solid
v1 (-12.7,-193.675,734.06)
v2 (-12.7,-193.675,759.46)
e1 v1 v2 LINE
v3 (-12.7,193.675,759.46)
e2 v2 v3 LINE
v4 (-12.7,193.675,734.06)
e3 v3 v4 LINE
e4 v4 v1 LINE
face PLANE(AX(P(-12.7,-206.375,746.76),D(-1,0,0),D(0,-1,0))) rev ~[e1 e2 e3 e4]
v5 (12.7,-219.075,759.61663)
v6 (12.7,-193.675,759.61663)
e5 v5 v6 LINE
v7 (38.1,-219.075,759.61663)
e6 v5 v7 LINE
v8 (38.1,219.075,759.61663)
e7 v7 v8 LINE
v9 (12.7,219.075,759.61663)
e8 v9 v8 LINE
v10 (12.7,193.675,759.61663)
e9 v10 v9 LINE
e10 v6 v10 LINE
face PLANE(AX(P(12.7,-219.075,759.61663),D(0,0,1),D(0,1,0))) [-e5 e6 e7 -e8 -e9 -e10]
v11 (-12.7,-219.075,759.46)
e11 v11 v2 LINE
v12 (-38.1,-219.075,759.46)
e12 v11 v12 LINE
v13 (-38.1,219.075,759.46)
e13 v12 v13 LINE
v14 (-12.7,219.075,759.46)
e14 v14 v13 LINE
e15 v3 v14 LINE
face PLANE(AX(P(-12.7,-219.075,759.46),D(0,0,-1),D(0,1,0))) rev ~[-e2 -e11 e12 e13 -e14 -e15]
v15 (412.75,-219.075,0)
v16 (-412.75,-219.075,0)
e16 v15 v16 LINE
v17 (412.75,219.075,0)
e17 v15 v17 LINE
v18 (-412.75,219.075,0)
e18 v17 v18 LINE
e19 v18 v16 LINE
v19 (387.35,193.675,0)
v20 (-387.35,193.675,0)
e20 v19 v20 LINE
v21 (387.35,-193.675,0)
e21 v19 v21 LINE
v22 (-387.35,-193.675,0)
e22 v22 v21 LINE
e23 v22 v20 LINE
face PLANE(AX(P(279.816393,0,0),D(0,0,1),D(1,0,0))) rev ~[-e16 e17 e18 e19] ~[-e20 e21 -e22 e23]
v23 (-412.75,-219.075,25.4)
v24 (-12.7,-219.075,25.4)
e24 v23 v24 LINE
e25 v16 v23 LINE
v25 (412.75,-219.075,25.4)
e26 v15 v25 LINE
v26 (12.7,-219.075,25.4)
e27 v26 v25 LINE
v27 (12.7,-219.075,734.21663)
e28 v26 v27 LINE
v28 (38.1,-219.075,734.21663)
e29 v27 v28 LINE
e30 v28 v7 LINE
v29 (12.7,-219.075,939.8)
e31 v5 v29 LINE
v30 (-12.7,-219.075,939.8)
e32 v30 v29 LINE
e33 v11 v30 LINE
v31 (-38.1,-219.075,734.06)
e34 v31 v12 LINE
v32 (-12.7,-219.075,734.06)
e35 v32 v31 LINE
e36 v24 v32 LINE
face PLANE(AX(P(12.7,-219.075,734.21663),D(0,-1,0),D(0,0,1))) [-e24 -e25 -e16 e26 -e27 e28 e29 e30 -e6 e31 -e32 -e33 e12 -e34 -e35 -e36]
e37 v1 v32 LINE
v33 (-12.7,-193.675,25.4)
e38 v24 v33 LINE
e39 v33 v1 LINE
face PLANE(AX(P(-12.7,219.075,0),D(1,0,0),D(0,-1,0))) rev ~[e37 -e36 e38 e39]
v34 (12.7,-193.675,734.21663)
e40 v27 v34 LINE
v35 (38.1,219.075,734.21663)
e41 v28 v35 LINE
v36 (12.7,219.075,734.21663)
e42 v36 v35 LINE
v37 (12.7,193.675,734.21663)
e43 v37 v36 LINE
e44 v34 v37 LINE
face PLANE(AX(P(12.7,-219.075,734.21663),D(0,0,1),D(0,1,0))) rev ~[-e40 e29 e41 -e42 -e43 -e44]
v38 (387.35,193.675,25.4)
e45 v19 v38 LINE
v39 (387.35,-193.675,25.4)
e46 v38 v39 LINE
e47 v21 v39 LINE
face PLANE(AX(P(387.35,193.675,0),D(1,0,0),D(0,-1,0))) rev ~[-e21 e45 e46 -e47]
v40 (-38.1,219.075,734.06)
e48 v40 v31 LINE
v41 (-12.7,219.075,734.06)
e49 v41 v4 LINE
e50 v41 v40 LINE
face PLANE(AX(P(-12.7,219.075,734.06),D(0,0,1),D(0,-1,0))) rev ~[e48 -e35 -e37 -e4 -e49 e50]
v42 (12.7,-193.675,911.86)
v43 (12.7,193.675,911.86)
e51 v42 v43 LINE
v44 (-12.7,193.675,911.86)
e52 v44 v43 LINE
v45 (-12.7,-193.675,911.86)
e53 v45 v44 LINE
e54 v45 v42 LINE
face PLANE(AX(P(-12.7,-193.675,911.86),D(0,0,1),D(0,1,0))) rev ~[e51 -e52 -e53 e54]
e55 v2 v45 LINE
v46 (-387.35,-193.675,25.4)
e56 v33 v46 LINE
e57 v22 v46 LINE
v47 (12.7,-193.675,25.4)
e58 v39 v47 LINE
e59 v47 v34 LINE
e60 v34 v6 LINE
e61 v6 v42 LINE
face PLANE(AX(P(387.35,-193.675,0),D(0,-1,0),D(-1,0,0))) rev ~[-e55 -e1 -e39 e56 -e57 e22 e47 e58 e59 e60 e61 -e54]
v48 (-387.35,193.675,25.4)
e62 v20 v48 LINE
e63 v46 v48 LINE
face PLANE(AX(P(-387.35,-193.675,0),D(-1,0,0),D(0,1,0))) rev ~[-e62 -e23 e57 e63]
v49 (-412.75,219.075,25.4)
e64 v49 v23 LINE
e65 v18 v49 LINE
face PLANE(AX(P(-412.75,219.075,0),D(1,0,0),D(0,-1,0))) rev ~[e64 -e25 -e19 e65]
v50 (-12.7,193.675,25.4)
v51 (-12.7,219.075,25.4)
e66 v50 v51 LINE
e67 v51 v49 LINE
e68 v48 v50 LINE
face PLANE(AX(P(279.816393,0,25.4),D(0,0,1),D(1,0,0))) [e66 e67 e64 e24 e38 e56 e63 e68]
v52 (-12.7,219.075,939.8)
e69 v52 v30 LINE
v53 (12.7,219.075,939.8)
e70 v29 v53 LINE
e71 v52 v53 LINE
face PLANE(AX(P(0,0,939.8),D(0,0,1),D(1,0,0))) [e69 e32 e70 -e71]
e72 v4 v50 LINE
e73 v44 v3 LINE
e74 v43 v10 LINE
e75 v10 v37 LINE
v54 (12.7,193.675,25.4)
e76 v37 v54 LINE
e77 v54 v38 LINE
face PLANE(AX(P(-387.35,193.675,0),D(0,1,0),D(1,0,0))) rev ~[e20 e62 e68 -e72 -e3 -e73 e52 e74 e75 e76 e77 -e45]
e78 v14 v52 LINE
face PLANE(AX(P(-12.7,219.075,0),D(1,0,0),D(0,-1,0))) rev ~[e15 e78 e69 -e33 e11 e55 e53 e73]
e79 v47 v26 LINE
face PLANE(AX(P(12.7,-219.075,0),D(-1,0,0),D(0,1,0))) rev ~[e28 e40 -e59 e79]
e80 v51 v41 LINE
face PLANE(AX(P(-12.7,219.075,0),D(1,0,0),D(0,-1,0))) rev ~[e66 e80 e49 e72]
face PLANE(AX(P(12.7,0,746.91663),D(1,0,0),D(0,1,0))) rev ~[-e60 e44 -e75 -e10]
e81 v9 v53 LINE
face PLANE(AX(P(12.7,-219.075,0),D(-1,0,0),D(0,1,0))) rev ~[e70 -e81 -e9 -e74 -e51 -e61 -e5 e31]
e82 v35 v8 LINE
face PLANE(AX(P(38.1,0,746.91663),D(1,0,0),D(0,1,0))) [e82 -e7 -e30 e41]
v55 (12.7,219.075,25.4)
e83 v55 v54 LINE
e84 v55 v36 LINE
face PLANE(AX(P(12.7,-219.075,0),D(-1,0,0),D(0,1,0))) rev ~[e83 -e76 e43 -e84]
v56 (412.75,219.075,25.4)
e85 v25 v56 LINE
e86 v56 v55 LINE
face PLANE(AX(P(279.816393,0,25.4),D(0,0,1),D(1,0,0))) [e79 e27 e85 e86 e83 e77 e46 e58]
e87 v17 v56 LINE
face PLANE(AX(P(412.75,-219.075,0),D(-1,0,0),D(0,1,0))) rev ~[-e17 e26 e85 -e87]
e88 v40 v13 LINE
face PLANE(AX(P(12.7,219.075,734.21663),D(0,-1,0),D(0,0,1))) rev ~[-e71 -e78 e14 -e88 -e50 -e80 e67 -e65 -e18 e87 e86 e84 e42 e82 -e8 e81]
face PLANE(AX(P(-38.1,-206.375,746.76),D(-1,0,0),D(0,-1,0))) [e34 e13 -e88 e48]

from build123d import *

# Parameters (mm, degrees)
F0_W      = 25.4
F0_H      = 25.4
F1_DEPTH  = 25.4
F0_H_2    = 387.35
F2_DEPTH  = 939.8
F4_DEPTH  = 25.4
F7_W      = 25.4
F7_H      = 25.4
F7_W_2    = 387.35
F8_DEPTH  = 25.4
F9_W      = 438.15
F9_H      = 25.4
F10_DEPTH = 25.4


# Not quite as in the source:
# - the program builds the solid bodies; features that only make, move or delete a surface that nothing else refers to are left out


with BuildPart() as f1:
    # F0 (on Top) → F1 (new body)
    with BuildSketch(Plane.XY):
        Polygon((412.75, -219.075), (412.75, 219.075), (38.1, 219.075), (38.1, 193.675), (387.35, 193.675), (387.35, -193.675), (38.1, -193.675), (38.1, -219.075), align=None)
        with Locations((25.4, 206.375)):
            Rectangle(F0_W, F0_H)
        with Locations((0, 206.375)):
            Rectangle(F0_W, F0_H)
        with Locations((25.4, -206.375)):
            Rectangle(F0_W, F0_H)
        with Locations((-25.4, 206.375)):
            Rectangle(F0_W, F0_H)
        with Locations((0, -206.375)):
            Rectangle(F0_W, F0_H)
        Polygon((-38.1, 193.675), (-38.1, 219.075), (-412.75, 219.075), (-412.75, -219.075), (-38.1, -219.075), (-38.1, -193.675), (-387.35, -193.675), (-387.35, 193.675), align=None)
        with Locations((-25.4, -206.375)):
            Rectangle(F0_W, F0_H)
    extrude(amount=F1_DEPTH)

    # F0 (on Top) → F2 (join)
    with BuildSketch(Plane.XY):
        Rectangle(F0_W, F0_H_2)
        with Locations((0, 206.375)):
            Rectangle(F0_W, F0_H)
        with Locations((0, -206.375)):
            Rectangle(F0_W, F0_H)
    extrude(amount=F2_DEPTH)

    # F3 (on face) → F4 (cut)
    with BuildSketch(Plane(origin=(-12.7, 0, 0), x_dir=(0, -1, 0), z_dir=(-1, 0, 0))):
        Polygon((-193.675, -2.54), (193.675, -2.54), (193.675, 737.5616856575), (193.675, 911.86), (-193.675, 911.86), (-193.675, 737.5616856575), align=None)
    extrude(amount=-F4_DEPTH, mode=Mode.SUBTRACT)

    # F7 (on face) → F8 (join)
    with BuildSketch(Plane(origin=(-12.7, 0, 0), x_dir=(0, -1, 0), z_dir=(-1, 0, 0))):
        with Locations((206.375, 746.76)):
            Rectangle(F7_W, F7_H)
        with Locations((0, 746.76)):
            Rectangle(F7_W_2, F7_H)
        with Locations((-206.375, 746.76)):
            Rectangle(F7_W, F7_H)
    extrude(amount=F8_DEPTH)

    # F9 (on face) → F10 (join)
    with BuildSketch(Plane.YZ.offset(12.7)):
        with Locations((0, 746.9166304588)):
            Rectangle(F9_W, F9_H)
    extrude(amount=F10_DEPTH)


solid = f1.part
